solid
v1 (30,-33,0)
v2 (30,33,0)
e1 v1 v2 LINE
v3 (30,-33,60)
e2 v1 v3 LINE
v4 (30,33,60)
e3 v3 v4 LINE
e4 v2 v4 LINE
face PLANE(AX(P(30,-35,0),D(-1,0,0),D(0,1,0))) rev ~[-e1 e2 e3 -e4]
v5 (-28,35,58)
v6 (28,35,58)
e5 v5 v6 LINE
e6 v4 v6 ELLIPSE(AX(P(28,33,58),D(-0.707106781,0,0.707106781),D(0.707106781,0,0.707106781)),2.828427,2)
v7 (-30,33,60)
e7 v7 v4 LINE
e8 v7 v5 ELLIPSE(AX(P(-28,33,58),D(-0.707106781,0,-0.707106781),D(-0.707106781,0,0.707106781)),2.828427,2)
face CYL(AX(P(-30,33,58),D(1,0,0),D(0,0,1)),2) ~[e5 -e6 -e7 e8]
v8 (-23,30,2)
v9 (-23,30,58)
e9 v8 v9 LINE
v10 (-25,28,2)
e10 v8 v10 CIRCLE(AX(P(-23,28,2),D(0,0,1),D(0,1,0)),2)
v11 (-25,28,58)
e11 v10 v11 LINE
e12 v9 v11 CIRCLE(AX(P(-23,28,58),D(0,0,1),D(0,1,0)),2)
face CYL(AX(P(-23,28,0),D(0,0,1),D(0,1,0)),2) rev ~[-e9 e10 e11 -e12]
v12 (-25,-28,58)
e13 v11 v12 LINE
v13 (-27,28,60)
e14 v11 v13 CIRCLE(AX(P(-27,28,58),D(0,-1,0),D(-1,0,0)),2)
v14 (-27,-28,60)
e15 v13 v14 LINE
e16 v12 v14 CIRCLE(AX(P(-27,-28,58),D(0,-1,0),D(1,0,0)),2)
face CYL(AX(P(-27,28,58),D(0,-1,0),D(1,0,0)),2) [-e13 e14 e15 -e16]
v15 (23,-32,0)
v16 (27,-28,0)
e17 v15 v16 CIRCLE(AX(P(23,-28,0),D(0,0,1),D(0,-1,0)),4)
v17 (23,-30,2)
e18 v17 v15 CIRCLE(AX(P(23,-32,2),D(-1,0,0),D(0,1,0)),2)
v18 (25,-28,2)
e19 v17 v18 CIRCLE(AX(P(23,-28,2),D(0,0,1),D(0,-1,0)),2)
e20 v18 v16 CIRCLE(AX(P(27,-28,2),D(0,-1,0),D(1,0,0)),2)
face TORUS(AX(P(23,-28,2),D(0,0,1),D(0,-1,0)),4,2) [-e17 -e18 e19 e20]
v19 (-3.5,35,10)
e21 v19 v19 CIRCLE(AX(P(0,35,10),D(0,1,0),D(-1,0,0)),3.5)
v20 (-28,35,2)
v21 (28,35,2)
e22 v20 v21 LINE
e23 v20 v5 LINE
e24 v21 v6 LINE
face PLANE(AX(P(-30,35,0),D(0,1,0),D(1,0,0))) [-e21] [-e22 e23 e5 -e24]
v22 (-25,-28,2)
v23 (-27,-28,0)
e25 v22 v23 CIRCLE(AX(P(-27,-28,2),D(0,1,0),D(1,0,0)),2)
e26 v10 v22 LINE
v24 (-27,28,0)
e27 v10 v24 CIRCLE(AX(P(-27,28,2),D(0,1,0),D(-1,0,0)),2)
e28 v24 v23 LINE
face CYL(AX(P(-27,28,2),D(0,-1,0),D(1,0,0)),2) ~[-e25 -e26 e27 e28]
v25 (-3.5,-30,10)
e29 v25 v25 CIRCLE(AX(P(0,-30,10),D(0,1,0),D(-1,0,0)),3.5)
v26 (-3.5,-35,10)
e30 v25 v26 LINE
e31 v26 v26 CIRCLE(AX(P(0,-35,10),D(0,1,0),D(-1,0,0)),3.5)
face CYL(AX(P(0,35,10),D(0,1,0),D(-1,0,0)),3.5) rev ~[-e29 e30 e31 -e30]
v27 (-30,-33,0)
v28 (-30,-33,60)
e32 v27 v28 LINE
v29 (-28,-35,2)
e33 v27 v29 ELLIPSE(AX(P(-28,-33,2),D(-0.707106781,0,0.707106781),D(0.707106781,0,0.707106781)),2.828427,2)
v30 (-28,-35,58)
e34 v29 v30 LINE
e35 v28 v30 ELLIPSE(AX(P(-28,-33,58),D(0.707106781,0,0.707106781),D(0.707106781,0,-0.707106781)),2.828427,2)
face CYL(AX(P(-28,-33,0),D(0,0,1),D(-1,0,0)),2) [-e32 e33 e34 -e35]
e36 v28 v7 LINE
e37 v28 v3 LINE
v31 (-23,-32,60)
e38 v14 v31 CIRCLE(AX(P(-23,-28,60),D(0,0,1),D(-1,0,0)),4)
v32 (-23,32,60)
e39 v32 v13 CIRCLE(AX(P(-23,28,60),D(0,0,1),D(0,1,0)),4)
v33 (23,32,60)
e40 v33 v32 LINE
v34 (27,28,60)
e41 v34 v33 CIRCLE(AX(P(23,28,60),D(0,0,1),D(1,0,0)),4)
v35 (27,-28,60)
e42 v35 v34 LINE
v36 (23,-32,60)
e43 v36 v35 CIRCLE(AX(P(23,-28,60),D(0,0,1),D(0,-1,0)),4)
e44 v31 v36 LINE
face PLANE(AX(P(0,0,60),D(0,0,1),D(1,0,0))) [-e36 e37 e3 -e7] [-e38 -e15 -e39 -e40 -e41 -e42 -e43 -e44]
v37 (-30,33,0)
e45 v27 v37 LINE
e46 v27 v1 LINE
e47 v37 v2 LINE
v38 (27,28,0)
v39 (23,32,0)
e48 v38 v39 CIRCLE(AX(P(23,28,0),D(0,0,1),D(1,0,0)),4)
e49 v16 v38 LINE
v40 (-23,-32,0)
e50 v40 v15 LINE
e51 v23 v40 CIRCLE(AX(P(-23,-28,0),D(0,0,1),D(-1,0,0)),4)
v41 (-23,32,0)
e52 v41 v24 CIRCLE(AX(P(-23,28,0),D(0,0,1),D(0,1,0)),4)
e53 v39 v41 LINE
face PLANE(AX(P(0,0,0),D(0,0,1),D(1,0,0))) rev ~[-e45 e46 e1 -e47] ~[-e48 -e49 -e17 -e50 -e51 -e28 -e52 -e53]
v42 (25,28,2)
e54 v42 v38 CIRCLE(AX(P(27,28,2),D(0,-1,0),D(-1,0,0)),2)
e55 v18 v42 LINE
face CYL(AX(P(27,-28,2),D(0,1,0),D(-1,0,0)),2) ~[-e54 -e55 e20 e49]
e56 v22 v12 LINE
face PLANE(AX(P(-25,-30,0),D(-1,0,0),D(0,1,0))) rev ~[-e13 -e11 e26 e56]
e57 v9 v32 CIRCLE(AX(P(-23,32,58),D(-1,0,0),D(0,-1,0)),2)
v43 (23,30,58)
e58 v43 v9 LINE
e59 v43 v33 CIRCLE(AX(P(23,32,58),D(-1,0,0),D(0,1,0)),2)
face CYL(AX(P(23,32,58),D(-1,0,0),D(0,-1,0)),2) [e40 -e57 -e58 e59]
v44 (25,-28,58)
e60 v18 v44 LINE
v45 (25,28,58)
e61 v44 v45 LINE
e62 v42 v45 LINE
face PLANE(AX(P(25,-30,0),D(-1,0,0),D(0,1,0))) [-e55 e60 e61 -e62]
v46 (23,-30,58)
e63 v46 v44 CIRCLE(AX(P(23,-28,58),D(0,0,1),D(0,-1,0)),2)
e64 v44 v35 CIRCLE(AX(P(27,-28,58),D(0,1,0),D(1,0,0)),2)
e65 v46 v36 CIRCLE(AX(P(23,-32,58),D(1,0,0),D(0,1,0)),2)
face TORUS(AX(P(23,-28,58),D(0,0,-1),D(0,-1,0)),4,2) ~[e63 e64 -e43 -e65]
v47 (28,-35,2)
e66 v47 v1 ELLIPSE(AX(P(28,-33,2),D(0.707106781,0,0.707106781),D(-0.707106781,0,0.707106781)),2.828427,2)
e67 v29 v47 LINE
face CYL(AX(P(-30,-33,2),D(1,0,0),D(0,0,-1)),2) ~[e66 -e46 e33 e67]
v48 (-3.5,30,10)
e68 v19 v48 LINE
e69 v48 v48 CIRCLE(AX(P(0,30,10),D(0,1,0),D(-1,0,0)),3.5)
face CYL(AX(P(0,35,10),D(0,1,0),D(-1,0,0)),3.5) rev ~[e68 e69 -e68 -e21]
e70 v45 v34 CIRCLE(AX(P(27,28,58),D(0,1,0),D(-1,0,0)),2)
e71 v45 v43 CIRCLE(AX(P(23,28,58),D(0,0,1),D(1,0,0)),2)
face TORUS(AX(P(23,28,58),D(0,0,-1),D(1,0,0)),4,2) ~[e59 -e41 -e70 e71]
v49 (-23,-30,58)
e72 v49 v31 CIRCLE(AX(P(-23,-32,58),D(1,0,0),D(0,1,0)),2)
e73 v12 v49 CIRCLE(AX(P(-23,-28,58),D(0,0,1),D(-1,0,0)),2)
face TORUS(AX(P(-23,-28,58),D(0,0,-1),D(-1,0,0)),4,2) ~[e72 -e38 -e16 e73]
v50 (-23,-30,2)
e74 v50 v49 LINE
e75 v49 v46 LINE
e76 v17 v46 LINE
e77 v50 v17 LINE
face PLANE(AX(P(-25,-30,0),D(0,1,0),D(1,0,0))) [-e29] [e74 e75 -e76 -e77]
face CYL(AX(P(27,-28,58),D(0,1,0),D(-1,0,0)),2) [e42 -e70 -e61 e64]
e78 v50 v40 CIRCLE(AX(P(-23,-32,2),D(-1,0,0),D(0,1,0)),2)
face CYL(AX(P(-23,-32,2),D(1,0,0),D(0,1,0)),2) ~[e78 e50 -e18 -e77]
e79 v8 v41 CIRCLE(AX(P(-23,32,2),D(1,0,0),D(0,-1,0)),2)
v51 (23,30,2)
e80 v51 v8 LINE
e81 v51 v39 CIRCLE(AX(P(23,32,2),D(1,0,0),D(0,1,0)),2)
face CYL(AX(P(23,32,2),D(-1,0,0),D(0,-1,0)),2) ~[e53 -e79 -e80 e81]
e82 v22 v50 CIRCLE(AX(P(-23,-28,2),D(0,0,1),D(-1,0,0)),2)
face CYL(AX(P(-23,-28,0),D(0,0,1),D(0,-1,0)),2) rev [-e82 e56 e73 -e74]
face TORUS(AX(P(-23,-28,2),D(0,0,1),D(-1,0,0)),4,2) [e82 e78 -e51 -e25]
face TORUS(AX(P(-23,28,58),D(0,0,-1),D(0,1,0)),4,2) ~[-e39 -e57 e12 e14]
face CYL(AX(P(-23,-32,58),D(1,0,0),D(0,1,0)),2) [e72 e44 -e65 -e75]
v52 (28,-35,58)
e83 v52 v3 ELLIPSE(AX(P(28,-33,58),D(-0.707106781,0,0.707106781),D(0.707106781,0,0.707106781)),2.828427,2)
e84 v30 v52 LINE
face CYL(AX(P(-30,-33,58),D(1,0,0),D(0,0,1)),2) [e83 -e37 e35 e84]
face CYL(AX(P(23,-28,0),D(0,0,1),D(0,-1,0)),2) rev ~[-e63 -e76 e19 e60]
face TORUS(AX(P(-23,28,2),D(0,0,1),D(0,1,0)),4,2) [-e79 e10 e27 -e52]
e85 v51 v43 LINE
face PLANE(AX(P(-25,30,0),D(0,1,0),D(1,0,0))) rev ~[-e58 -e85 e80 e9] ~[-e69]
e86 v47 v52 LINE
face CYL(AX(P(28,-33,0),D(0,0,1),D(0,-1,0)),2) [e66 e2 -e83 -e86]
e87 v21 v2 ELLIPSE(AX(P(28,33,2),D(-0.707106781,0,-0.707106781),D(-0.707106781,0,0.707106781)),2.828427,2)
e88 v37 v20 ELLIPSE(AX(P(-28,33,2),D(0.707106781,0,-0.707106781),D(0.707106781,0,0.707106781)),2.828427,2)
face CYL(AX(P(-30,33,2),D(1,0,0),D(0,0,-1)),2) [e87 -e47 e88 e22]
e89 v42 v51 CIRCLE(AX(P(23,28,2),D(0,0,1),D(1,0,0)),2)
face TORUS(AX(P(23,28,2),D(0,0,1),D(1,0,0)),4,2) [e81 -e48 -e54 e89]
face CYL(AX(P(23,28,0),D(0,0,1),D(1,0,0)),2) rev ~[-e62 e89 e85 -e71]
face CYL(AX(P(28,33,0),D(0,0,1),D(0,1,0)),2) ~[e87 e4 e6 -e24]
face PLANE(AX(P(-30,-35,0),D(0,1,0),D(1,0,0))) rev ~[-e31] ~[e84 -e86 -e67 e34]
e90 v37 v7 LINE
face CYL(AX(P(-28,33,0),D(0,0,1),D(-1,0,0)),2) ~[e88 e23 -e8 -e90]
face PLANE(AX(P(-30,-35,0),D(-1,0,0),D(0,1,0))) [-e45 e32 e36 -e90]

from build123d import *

# Parameters (mm, degrees)
F0_W     = 60
F0_H     = 70
F0_W_2   = 50
F0_H_2   = 60
F1_DEPTH = 60
F2_F1_R  = 2
F2_F2_R  = 2
F4_R     = 3.5
F5_DEPTH = 70


with BuildPart() as f1:
    # F0 (on Top) → F1 (new body)
    with BuildSketch(Plane.XY):
        Rectangle(F0_W, F0_H)
        Rectangle(F0_W_2, F0_H_2, mode=Mode.SUBTRACT)
    extrude(amount=F1_DEPTH)

    # F2: fillet of radius 2 on 16 edges, made by hand

    # F2_f1
    f2_f1_edges = [f1.edges().sort_by_distance(p)[0] for p in [
        (-25, -30, 30),
        (25, -30, 30),
        (25, 30, 30),
        (-25, 30, 30),
    ]]
    fillet(f2_f1_edges, radius=F2_F1_R)

    # F2_f2
    f2_f2_edges = [f1.edges().sort_by_distance(p)[0] for p in [
        (-30, 35, 30),
        (0, 35, 60),
        (30, 35, 30),
        (0, 35, 0),
        (30, -35, 30),
        (0, -35, 60),
        (-30, -35, 30),
        (0, -35, 0),
        (0, -30, 60),
        (0, -30, 0),
        (0, 30, 60),
        (0, 30, 0),
        (-24.4142135624, 29.4142135624, 0),
        (24.4142135624, 29.4142135624, 0),
        (-24.4142135624, 29.4142135624, 60),
        (24.4142135624, 29.4142135624, 60),
        (24.4142135624, -29.4142135624, 0),
        (-24.4142135624, -29.4142135624, 0),
        (24.4142135624, -29.4142135624, 60),
        (-24.4142135624, -29.4142135624, 60),
    ]]
    fillet(f2_f2_edges, radius=F2_F2_R)

    # F4 (on face) → F5 (cut)
    with BuildSketch(Plane(origin=(0, 35, 0), x_dir=(-1, 0, 0), z_dir=(0, 1, 0))):
        with Locations((0, 10)):
            Circle(F4_R)
    extrude(amount=-F5_DEPTH, mode=Mode.SUBTRACT)


solid = f1.part
